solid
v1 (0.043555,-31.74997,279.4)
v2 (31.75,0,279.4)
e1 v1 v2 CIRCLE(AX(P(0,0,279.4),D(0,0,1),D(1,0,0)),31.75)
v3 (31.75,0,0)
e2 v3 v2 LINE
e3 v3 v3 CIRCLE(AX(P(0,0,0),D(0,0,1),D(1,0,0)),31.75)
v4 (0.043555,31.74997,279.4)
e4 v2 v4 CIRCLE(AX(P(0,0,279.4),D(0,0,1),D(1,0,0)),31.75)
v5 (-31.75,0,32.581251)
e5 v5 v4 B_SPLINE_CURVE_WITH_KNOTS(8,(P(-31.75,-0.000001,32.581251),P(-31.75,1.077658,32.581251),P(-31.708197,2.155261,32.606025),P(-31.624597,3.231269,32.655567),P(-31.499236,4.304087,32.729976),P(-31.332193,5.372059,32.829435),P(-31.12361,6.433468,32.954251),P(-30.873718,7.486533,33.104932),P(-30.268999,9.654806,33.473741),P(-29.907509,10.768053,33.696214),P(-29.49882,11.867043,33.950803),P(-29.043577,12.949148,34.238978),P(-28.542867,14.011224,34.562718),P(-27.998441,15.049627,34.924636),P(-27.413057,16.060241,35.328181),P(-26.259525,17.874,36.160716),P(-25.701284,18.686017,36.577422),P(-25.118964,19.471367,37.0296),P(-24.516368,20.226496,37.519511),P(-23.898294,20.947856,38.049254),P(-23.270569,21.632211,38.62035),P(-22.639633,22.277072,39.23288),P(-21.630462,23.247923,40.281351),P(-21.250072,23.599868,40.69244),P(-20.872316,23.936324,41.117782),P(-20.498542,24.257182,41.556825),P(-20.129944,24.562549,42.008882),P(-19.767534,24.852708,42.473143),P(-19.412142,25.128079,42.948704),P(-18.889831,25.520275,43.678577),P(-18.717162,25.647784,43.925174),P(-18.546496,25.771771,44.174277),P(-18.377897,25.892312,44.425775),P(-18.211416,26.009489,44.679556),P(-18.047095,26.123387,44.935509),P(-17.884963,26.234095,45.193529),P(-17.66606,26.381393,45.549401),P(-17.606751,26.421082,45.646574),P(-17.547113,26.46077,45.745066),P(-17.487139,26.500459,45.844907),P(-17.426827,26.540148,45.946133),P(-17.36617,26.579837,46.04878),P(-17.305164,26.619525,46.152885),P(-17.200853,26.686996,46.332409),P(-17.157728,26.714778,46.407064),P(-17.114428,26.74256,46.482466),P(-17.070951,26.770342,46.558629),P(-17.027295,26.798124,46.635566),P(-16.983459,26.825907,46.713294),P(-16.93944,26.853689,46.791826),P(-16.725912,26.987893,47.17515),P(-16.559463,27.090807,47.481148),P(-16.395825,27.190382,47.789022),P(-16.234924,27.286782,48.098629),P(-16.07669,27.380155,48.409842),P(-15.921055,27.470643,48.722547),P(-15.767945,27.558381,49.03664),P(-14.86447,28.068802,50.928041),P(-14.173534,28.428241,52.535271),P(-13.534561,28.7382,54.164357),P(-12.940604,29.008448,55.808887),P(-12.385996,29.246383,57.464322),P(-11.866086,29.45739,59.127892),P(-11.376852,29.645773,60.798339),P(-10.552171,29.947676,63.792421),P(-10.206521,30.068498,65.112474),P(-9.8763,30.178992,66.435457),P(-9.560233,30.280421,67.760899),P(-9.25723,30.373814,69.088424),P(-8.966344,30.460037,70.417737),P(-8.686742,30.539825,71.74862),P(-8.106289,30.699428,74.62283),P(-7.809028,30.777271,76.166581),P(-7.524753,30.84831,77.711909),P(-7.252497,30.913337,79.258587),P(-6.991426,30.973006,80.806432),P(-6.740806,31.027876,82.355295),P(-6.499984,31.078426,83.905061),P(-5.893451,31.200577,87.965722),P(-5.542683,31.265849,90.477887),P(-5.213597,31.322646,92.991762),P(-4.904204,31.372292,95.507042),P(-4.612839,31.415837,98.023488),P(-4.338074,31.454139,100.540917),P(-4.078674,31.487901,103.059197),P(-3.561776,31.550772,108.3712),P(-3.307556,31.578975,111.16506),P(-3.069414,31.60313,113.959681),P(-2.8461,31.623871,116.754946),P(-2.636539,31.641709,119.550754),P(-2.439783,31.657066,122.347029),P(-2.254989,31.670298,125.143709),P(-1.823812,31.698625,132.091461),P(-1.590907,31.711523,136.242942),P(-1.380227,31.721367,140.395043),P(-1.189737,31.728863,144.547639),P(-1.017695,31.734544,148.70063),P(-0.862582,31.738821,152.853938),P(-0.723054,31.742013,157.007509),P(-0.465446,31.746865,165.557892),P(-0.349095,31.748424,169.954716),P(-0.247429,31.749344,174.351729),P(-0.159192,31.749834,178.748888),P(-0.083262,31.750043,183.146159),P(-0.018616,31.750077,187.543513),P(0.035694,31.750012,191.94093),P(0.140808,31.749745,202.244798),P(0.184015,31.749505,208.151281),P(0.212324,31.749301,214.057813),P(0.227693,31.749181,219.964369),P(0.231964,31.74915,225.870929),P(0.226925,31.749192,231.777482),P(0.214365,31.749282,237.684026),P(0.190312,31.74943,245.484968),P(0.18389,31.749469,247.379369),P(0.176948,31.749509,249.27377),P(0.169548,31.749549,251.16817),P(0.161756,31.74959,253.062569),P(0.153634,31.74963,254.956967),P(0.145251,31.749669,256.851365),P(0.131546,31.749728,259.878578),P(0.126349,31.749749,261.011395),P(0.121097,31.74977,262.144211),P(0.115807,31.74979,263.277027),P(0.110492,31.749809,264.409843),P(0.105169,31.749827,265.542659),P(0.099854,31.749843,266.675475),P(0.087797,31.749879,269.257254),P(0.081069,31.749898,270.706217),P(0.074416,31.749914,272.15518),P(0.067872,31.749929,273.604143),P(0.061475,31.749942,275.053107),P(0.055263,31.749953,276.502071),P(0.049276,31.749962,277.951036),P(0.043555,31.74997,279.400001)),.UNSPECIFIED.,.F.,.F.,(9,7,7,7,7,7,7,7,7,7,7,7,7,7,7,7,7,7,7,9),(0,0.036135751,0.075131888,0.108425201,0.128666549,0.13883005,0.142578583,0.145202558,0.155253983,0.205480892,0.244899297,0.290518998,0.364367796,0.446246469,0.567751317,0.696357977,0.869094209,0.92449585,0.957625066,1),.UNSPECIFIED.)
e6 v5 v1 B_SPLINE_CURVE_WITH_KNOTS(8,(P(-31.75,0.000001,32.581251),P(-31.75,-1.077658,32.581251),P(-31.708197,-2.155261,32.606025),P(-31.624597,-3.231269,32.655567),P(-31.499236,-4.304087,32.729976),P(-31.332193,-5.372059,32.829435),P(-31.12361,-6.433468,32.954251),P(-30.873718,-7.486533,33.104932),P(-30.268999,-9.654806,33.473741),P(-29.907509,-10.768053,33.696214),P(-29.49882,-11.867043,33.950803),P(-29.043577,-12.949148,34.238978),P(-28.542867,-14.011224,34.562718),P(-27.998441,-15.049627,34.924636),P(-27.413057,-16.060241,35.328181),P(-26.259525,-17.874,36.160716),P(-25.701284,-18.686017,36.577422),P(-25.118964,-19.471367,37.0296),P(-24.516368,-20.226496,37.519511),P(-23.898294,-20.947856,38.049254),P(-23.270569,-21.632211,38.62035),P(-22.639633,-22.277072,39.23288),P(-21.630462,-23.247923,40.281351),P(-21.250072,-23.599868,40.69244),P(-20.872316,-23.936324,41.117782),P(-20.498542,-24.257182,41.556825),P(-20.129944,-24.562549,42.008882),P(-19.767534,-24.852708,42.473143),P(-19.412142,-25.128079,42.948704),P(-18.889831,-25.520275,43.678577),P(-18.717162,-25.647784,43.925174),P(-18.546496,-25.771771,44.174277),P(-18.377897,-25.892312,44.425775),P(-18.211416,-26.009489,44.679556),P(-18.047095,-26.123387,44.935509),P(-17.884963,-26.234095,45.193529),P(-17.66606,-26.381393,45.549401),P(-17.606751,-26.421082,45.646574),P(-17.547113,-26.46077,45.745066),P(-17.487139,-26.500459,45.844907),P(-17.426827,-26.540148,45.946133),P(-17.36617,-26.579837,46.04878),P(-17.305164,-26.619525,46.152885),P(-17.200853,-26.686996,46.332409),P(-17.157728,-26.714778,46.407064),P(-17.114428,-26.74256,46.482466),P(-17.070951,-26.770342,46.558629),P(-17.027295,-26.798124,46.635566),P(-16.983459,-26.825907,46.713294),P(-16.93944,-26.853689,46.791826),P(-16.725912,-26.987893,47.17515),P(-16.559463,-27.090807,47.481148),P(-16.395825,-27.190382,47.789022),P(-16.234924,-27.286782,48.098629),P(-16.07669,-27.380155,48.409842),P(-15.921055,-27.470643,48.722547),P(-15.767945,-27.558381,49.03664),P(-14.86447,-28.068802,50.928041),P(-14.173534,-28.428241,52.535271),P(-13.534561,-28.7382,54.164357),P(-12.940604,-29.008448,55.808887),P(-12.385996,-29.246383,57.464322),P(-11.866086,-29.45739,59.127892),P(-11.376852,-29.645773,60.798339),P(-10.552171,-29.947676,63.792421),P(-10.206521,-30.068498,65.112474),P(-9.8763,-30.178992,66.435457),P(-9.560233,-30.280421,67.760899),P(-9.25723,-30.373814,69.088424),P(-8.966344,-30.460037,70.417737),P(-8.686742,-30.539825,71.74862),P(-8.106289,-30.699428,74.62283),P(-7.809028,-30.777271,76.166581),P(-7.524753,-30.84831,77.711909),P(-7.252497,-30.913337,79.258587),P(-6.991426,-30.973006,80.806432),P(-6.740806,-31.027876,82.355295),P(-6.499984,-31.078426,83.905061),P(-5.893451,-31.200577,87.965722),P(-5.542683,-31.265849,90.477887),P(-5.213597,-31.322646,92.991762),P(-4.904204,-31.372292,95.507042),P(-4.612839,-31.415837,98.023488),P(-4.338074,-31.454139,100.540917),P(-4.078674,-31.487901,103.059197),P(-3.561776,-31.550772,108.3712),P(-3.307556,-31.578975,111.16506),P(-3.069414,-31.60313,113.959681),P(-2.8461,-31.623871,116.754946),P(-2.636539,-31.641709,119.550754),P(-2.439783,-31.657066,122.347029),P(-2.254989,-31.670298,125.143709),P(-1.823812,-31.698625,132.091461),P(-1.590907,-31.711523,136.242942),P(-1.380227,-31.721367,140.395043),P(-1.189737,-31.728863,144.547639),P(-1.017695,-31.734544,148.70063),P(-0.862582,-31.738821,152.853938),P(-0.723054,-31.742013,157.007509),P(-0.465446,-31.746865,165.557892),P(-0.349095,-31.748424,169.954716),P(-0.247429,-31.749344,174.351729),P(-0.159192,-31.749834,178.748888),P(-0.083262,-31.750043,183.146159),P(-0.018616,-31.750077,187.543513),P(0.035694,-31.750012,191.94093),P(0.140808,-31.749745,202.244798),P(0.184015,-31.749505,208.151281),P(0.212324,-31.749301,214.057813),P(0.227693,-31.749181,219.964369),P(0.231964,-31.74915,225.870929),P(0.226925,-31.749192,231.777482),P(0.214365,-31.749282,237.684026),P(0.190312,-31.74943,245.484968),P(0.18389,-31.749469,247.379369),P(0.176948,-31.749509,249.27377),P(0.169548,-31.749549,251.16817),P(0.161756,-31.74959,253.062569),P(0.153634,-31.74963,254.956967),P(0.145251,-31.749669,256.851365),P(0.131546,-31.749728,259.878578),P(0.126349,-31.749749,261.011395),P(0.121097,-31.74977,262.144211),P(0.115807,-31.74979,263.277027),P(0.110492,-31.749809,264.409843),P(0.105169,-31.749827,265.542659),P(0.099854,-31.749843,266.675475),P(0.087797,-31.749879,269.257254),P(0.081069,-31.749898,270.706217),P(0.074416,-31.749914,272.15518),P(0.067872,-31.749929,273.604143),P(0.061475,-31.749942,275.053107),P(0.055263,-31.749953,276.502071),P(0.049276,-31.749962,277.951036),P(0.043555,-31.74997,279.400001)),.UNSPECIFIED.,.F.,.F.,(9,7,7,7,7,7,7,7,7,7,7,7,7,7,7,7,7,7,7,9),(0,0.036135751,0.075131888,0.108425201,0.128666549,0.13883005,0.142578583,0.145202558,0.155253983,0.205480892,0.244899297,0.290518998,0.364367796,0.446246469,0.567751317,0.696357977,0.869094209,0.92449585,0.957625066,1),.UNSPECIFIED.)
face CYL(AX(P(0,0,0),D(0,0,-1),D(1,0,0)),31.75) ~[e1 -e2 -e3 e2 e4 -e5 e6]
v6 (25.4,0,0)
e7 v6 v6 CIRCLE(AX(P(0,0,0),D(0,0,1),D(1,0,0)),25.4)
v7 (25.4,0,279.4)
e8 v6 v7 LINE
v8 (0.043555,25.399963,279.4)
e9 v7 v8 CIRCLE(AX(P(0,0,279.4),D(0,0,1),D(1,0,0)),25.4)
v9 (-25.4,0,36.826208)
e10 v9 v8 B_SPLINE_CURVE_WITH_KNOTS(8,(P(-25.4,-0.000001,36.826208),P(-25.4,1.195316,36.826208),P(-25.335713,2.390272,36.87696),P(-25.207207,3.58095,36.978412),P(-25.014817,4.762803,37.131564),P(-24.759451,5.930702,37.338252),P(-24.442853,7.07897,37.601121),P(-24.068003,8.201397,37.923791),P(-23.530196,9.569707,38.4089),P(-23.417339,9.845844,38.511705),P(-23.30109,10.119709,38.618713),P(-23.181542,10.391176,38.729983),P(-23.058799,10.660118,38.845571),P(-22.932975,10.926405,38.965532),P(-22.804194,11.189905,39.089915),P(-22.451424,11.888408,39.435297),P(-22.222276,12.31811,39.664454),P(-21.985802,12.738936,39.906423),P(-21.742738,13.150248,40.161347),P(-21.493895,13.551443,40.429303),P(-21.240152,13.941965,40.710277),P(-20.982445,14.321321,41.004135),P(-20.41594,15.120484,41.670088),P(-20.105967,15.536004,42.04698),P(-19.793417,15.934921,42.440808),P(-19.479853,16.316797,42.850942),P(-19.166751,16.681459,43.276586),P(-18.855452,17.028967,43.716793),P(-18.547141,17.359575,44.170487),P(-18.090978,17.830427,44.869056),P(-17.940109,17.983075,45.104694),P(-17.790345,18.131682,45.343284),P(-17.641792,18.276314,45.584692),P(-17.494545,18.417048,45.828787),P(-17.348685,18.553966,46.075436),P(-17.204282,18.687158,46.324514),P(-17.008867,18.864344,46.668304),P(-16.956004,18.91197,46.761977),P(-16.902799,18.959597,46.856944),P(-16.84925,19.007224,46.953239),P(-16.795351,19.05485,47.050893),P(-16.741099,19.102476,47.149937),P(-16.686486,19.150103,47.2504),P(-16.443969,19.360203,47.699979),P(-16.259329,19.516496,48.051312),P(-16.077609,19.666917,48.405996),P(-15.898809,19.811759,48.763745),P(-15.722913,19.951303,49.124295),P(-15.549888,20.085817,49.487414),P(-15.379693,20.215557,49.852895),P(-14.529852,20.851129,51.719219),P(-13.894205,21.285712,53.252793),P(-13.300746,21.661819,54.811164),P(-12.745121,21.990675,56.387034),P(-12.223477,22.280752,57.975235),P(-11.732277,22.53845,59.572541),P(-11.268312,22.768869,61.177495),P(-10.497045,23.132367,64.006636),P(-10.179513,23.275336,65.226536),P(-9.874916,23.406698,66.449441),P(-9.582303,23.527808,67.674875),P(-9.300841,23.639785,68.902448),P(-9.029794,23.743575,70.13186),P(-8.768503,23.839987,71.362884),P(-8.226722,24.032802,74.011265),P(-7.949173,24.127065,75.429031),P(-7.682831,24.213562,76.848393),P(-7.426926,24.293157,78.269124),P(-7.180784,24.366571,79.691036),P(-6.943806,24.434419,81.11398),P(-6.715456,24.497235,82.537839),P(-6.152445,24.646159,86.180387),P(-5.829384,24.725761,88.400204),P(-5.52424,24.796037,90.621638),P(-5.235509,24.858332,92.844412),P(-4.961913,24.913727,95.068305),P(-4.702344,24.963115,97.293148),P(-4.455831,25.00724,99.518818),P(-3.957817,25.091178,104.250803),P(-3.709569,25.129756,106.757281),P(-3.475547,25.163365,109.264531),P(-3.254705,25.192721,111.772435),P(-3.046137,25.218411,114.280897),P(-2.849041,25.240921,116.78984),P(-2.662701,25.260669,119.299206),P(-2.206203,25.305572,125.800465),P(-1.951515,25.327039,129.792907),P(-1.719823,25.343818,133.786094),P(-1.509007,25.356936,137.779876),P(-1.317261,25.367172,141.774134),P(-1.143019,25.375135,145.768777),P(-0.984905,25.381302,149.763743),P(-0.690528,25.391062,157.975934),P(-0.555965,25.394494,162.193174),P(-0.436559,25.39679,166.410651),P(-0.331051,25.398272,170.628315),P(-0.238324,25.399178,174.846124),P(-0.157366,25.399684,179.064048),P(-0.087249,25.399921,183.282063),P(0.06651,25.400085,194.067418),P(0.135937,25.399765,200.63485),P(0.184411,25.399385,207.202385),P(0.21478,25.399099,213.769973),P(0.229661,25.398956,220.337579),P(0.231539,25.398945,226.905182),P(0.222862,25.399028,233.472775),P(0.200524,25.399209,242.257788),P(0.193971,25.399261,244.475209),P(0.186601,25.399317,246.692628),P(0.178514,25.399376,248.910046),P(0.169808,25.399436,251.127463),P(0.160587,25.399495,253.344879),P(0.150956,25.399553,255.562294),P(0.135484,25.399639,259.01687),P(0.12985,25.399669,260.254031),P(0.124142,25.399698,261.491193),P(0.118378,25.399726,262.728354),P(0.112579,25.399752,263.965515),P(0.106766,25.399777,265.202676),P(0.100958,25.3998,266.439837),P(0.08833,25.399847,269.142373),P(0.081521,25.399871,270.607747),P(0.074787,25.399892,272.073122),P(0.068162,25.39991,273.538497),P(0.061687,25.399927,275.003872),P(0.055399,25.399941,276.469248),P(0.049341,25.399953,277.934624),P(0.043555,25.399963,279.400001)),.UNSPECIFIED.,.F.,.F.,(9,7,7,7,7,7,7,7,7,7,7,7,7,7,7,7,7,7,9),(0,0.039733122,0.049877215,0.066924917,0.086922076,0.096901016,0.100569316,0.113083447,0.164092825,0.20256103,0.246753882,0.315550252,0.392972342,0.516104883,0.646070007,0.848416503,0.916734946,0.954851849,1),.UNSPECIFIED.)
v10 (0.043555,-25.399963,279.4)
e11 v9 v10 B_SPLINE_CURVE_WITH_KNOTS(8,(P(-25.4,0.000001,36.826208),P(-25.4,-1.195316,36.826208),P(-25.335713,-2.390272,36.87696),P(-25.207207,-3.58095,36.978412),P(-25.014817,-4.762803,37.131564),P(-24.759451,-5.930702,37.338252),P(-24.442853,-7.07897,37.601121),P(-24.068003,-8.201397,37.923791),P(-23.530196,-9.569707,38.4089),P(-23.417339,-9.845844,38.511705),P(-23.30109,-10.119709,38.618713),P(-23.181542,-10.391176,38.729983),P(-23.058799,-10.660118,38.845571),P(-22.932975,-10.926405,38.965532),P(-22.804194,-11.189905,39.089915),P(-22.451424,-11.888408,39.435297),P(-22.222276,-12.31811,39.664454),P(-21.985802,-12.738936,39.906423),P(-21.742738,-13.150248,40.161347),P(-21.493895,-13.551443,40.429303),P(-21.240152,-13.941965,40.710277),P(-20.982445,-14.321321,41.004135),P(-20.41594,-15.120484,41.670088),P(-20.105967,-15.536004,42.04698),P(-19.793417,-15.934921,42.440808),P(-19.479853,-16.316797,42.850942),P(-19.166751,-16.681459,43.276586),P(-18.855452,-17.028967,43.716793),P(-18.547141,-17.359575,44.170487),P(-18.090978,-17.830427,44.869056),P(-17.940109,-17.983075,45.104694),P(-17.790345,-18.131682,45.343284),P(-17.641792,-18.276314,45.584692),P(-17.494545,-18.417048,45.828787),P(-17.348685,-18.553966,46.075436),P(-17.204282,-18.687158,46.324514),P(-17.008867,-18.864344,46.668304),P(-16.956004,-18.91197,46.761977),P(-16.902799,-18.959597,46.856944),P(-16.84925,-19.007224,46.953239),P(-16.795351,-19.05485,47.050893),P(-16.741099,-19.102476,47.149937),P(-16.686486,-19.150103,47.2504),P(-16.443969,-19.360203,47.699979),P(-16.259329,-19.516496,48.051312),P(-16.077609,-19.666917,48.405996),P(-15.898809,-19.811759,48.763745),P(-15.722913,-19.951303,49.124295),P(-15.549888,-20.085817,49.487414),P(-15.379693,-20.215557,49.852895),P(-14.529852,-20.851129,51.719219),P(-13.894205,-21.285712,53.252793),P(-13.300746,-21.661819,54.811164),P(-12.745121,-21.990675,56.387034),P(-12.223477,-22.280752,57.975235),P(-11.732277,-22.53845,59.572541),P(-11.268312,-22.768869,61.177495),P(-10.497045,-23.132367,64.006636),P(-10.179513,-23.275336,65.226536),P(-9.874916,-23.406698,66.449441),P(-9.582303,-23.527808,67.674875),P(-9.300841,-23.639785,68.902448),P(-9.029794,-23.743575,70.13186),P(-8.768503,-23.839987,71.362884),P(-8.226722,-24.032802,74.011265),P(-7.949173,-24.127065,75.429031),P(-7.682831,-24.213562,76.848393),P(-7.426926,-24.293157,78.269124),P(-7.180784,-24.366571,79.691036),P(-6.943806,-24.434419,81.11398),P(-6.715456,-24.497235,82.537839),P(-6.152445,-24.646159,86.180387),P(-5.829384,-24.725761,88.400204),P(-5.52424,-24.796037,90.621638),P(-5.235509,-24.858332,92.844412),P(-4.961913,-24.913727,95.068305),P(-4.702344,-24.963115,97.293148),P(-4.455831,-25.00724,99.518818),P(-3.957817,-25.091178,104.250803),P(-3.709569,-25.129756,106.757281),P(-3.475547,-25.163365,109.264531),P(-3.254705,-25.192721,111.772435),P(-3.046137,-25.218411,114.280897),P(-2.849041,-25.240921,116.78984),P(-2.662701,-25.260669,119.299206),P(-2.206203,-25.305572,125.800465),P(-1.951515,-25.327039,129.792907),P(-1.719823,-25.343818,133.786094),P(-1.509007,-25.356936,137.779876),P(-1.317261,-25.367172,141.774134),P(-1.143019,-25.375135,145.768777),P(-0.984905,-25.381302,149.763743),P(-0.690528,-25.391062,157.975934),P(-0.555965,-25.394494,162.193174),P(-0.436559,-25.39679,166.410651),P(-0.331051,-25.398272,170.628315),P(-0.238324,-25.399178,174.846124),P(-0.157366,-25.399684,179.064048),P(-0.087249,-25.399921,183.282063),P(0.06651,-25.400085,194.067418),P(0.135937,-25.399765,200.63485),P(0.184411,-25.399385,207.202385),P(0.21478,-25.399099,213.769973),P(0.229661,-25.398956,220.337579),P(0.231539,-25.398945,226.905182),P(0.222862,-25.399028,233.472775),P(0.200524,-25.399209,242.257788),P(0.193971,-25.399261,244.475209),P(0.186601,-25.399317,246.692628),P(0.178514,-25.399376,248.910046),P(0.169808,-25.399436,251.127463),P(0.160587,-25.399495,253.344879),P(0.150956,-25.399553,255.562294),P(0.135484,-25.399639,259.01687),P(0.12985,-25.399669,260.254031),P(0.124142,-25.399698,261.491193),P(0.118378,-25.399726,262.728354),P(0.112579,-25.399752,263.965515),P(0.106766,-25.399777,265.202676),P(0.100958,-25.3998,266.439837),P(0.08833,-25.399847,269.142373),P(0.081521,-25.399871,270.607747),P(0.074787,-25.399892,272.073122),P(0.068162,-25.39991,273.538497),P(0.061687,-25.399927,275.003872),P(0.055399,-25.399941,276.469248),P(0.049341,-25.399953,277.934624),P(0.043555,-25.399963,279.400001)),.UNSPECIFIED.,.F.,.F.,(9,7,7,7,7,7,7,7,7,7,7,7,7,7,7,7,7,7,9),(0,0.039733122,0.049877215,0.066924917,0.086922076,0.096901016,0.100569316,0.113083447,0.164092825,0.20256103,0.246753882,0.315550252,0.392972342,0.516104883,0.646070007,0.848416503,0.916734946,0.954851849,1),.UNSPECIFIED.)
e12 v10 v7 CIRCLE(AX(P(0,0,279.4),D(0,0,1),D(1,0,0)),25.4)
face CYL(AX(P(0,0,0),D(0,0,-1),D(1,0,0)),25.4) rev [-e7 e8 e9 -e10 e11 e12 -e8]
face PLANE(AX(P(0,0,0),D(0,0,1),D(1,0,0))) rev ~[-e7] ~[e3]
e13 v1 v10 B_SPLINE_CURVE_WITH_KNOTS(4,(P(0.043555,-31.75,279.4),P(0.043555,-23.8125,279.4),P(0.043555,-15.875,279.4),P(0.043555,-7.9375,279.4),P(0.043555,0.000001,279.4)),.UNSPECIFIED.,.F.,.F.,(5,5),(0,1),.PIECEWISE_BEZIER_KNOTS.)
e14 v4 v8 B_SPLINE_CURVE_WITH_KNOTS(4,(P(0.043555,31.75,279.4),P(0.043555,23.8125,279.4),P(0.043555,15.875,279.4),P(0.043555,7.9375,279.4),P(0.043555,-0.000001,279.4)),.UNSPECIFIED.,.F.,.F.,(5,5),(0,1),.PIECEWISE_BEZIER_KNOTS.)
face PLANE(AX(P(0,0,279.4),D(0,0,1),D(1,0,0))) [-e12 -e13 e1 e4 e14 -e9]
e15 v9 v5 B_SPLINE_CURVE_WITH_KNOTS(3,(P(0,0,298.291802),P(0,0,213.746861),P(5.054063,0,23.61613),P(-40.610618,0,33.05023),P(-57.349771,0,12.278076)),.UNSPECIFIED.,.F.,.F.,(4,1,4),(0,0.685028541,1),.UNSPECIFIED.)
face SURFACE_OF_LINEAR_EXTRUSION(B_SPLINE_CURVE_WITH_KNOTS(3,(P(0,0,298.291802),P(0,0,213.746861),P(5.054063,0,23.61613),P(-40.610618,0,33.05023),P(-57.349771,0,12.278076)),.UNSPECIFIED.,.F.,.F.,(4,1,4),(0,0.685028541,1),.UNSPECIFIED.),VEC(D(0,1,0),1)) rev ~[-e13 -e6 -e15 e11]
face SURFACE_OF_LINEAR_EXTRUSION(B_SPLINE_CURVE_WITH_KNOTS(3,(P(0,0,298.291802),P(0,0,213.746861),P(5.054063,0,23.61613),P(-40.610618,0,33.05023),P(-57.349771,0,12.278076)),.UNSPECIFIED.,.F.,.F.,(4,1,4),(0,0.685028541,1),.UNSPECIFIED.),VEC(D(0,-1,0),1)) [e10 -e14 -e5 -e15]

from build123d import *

# Parameters (mm, degrees)
F0_R          = 31.75
F0_R_2        = 25.4
F1_DEPTH      = 279.4
F3_DEPTH      = 31.751
F3_DEPTH_BACK = 31.751


with BuildPart() as f1:
    # F0 (on Top) → F1 (new body)
    with BuildSketch(Plane.XY):
        Circle(F0_R)
        Circle(F0_R_2, mode=Mode.SUBTRACT)
    extrude(amount=F1_DEPTH)

    # F2 (on Front) → F3 (cut, two sides)
    with BuildSketch(Plane.XZ) as f3_sk:
        with BuildLine():
            add(Edge.make_bspline(
                [(0, 298.2918024063), (0, 213.7468606234), (5.0540628254, 23.6161296496), (-40.6106183642, 33.05023015), (-57.3497712612, 12.2780762613)],
                knots=[0, 0, 0, 0, 0.685028541, 1, 1, 1, 1], degree=3))
            Line((0, 298.2918024063), (-57.3497712612, 299.4403541088))
            Line((-57.3497712612, 299.4403541088), (-57.3497712612, 12.2780762613))
        make_face()
    extrude(amount=F3_DEPTH, mode=Mode.SUBTRACT)
    extrude(f3_sk.sketch, amount=-F3_DEPTH_BACK, mode=Mode.SUBTRACT)


solid = f1.part
